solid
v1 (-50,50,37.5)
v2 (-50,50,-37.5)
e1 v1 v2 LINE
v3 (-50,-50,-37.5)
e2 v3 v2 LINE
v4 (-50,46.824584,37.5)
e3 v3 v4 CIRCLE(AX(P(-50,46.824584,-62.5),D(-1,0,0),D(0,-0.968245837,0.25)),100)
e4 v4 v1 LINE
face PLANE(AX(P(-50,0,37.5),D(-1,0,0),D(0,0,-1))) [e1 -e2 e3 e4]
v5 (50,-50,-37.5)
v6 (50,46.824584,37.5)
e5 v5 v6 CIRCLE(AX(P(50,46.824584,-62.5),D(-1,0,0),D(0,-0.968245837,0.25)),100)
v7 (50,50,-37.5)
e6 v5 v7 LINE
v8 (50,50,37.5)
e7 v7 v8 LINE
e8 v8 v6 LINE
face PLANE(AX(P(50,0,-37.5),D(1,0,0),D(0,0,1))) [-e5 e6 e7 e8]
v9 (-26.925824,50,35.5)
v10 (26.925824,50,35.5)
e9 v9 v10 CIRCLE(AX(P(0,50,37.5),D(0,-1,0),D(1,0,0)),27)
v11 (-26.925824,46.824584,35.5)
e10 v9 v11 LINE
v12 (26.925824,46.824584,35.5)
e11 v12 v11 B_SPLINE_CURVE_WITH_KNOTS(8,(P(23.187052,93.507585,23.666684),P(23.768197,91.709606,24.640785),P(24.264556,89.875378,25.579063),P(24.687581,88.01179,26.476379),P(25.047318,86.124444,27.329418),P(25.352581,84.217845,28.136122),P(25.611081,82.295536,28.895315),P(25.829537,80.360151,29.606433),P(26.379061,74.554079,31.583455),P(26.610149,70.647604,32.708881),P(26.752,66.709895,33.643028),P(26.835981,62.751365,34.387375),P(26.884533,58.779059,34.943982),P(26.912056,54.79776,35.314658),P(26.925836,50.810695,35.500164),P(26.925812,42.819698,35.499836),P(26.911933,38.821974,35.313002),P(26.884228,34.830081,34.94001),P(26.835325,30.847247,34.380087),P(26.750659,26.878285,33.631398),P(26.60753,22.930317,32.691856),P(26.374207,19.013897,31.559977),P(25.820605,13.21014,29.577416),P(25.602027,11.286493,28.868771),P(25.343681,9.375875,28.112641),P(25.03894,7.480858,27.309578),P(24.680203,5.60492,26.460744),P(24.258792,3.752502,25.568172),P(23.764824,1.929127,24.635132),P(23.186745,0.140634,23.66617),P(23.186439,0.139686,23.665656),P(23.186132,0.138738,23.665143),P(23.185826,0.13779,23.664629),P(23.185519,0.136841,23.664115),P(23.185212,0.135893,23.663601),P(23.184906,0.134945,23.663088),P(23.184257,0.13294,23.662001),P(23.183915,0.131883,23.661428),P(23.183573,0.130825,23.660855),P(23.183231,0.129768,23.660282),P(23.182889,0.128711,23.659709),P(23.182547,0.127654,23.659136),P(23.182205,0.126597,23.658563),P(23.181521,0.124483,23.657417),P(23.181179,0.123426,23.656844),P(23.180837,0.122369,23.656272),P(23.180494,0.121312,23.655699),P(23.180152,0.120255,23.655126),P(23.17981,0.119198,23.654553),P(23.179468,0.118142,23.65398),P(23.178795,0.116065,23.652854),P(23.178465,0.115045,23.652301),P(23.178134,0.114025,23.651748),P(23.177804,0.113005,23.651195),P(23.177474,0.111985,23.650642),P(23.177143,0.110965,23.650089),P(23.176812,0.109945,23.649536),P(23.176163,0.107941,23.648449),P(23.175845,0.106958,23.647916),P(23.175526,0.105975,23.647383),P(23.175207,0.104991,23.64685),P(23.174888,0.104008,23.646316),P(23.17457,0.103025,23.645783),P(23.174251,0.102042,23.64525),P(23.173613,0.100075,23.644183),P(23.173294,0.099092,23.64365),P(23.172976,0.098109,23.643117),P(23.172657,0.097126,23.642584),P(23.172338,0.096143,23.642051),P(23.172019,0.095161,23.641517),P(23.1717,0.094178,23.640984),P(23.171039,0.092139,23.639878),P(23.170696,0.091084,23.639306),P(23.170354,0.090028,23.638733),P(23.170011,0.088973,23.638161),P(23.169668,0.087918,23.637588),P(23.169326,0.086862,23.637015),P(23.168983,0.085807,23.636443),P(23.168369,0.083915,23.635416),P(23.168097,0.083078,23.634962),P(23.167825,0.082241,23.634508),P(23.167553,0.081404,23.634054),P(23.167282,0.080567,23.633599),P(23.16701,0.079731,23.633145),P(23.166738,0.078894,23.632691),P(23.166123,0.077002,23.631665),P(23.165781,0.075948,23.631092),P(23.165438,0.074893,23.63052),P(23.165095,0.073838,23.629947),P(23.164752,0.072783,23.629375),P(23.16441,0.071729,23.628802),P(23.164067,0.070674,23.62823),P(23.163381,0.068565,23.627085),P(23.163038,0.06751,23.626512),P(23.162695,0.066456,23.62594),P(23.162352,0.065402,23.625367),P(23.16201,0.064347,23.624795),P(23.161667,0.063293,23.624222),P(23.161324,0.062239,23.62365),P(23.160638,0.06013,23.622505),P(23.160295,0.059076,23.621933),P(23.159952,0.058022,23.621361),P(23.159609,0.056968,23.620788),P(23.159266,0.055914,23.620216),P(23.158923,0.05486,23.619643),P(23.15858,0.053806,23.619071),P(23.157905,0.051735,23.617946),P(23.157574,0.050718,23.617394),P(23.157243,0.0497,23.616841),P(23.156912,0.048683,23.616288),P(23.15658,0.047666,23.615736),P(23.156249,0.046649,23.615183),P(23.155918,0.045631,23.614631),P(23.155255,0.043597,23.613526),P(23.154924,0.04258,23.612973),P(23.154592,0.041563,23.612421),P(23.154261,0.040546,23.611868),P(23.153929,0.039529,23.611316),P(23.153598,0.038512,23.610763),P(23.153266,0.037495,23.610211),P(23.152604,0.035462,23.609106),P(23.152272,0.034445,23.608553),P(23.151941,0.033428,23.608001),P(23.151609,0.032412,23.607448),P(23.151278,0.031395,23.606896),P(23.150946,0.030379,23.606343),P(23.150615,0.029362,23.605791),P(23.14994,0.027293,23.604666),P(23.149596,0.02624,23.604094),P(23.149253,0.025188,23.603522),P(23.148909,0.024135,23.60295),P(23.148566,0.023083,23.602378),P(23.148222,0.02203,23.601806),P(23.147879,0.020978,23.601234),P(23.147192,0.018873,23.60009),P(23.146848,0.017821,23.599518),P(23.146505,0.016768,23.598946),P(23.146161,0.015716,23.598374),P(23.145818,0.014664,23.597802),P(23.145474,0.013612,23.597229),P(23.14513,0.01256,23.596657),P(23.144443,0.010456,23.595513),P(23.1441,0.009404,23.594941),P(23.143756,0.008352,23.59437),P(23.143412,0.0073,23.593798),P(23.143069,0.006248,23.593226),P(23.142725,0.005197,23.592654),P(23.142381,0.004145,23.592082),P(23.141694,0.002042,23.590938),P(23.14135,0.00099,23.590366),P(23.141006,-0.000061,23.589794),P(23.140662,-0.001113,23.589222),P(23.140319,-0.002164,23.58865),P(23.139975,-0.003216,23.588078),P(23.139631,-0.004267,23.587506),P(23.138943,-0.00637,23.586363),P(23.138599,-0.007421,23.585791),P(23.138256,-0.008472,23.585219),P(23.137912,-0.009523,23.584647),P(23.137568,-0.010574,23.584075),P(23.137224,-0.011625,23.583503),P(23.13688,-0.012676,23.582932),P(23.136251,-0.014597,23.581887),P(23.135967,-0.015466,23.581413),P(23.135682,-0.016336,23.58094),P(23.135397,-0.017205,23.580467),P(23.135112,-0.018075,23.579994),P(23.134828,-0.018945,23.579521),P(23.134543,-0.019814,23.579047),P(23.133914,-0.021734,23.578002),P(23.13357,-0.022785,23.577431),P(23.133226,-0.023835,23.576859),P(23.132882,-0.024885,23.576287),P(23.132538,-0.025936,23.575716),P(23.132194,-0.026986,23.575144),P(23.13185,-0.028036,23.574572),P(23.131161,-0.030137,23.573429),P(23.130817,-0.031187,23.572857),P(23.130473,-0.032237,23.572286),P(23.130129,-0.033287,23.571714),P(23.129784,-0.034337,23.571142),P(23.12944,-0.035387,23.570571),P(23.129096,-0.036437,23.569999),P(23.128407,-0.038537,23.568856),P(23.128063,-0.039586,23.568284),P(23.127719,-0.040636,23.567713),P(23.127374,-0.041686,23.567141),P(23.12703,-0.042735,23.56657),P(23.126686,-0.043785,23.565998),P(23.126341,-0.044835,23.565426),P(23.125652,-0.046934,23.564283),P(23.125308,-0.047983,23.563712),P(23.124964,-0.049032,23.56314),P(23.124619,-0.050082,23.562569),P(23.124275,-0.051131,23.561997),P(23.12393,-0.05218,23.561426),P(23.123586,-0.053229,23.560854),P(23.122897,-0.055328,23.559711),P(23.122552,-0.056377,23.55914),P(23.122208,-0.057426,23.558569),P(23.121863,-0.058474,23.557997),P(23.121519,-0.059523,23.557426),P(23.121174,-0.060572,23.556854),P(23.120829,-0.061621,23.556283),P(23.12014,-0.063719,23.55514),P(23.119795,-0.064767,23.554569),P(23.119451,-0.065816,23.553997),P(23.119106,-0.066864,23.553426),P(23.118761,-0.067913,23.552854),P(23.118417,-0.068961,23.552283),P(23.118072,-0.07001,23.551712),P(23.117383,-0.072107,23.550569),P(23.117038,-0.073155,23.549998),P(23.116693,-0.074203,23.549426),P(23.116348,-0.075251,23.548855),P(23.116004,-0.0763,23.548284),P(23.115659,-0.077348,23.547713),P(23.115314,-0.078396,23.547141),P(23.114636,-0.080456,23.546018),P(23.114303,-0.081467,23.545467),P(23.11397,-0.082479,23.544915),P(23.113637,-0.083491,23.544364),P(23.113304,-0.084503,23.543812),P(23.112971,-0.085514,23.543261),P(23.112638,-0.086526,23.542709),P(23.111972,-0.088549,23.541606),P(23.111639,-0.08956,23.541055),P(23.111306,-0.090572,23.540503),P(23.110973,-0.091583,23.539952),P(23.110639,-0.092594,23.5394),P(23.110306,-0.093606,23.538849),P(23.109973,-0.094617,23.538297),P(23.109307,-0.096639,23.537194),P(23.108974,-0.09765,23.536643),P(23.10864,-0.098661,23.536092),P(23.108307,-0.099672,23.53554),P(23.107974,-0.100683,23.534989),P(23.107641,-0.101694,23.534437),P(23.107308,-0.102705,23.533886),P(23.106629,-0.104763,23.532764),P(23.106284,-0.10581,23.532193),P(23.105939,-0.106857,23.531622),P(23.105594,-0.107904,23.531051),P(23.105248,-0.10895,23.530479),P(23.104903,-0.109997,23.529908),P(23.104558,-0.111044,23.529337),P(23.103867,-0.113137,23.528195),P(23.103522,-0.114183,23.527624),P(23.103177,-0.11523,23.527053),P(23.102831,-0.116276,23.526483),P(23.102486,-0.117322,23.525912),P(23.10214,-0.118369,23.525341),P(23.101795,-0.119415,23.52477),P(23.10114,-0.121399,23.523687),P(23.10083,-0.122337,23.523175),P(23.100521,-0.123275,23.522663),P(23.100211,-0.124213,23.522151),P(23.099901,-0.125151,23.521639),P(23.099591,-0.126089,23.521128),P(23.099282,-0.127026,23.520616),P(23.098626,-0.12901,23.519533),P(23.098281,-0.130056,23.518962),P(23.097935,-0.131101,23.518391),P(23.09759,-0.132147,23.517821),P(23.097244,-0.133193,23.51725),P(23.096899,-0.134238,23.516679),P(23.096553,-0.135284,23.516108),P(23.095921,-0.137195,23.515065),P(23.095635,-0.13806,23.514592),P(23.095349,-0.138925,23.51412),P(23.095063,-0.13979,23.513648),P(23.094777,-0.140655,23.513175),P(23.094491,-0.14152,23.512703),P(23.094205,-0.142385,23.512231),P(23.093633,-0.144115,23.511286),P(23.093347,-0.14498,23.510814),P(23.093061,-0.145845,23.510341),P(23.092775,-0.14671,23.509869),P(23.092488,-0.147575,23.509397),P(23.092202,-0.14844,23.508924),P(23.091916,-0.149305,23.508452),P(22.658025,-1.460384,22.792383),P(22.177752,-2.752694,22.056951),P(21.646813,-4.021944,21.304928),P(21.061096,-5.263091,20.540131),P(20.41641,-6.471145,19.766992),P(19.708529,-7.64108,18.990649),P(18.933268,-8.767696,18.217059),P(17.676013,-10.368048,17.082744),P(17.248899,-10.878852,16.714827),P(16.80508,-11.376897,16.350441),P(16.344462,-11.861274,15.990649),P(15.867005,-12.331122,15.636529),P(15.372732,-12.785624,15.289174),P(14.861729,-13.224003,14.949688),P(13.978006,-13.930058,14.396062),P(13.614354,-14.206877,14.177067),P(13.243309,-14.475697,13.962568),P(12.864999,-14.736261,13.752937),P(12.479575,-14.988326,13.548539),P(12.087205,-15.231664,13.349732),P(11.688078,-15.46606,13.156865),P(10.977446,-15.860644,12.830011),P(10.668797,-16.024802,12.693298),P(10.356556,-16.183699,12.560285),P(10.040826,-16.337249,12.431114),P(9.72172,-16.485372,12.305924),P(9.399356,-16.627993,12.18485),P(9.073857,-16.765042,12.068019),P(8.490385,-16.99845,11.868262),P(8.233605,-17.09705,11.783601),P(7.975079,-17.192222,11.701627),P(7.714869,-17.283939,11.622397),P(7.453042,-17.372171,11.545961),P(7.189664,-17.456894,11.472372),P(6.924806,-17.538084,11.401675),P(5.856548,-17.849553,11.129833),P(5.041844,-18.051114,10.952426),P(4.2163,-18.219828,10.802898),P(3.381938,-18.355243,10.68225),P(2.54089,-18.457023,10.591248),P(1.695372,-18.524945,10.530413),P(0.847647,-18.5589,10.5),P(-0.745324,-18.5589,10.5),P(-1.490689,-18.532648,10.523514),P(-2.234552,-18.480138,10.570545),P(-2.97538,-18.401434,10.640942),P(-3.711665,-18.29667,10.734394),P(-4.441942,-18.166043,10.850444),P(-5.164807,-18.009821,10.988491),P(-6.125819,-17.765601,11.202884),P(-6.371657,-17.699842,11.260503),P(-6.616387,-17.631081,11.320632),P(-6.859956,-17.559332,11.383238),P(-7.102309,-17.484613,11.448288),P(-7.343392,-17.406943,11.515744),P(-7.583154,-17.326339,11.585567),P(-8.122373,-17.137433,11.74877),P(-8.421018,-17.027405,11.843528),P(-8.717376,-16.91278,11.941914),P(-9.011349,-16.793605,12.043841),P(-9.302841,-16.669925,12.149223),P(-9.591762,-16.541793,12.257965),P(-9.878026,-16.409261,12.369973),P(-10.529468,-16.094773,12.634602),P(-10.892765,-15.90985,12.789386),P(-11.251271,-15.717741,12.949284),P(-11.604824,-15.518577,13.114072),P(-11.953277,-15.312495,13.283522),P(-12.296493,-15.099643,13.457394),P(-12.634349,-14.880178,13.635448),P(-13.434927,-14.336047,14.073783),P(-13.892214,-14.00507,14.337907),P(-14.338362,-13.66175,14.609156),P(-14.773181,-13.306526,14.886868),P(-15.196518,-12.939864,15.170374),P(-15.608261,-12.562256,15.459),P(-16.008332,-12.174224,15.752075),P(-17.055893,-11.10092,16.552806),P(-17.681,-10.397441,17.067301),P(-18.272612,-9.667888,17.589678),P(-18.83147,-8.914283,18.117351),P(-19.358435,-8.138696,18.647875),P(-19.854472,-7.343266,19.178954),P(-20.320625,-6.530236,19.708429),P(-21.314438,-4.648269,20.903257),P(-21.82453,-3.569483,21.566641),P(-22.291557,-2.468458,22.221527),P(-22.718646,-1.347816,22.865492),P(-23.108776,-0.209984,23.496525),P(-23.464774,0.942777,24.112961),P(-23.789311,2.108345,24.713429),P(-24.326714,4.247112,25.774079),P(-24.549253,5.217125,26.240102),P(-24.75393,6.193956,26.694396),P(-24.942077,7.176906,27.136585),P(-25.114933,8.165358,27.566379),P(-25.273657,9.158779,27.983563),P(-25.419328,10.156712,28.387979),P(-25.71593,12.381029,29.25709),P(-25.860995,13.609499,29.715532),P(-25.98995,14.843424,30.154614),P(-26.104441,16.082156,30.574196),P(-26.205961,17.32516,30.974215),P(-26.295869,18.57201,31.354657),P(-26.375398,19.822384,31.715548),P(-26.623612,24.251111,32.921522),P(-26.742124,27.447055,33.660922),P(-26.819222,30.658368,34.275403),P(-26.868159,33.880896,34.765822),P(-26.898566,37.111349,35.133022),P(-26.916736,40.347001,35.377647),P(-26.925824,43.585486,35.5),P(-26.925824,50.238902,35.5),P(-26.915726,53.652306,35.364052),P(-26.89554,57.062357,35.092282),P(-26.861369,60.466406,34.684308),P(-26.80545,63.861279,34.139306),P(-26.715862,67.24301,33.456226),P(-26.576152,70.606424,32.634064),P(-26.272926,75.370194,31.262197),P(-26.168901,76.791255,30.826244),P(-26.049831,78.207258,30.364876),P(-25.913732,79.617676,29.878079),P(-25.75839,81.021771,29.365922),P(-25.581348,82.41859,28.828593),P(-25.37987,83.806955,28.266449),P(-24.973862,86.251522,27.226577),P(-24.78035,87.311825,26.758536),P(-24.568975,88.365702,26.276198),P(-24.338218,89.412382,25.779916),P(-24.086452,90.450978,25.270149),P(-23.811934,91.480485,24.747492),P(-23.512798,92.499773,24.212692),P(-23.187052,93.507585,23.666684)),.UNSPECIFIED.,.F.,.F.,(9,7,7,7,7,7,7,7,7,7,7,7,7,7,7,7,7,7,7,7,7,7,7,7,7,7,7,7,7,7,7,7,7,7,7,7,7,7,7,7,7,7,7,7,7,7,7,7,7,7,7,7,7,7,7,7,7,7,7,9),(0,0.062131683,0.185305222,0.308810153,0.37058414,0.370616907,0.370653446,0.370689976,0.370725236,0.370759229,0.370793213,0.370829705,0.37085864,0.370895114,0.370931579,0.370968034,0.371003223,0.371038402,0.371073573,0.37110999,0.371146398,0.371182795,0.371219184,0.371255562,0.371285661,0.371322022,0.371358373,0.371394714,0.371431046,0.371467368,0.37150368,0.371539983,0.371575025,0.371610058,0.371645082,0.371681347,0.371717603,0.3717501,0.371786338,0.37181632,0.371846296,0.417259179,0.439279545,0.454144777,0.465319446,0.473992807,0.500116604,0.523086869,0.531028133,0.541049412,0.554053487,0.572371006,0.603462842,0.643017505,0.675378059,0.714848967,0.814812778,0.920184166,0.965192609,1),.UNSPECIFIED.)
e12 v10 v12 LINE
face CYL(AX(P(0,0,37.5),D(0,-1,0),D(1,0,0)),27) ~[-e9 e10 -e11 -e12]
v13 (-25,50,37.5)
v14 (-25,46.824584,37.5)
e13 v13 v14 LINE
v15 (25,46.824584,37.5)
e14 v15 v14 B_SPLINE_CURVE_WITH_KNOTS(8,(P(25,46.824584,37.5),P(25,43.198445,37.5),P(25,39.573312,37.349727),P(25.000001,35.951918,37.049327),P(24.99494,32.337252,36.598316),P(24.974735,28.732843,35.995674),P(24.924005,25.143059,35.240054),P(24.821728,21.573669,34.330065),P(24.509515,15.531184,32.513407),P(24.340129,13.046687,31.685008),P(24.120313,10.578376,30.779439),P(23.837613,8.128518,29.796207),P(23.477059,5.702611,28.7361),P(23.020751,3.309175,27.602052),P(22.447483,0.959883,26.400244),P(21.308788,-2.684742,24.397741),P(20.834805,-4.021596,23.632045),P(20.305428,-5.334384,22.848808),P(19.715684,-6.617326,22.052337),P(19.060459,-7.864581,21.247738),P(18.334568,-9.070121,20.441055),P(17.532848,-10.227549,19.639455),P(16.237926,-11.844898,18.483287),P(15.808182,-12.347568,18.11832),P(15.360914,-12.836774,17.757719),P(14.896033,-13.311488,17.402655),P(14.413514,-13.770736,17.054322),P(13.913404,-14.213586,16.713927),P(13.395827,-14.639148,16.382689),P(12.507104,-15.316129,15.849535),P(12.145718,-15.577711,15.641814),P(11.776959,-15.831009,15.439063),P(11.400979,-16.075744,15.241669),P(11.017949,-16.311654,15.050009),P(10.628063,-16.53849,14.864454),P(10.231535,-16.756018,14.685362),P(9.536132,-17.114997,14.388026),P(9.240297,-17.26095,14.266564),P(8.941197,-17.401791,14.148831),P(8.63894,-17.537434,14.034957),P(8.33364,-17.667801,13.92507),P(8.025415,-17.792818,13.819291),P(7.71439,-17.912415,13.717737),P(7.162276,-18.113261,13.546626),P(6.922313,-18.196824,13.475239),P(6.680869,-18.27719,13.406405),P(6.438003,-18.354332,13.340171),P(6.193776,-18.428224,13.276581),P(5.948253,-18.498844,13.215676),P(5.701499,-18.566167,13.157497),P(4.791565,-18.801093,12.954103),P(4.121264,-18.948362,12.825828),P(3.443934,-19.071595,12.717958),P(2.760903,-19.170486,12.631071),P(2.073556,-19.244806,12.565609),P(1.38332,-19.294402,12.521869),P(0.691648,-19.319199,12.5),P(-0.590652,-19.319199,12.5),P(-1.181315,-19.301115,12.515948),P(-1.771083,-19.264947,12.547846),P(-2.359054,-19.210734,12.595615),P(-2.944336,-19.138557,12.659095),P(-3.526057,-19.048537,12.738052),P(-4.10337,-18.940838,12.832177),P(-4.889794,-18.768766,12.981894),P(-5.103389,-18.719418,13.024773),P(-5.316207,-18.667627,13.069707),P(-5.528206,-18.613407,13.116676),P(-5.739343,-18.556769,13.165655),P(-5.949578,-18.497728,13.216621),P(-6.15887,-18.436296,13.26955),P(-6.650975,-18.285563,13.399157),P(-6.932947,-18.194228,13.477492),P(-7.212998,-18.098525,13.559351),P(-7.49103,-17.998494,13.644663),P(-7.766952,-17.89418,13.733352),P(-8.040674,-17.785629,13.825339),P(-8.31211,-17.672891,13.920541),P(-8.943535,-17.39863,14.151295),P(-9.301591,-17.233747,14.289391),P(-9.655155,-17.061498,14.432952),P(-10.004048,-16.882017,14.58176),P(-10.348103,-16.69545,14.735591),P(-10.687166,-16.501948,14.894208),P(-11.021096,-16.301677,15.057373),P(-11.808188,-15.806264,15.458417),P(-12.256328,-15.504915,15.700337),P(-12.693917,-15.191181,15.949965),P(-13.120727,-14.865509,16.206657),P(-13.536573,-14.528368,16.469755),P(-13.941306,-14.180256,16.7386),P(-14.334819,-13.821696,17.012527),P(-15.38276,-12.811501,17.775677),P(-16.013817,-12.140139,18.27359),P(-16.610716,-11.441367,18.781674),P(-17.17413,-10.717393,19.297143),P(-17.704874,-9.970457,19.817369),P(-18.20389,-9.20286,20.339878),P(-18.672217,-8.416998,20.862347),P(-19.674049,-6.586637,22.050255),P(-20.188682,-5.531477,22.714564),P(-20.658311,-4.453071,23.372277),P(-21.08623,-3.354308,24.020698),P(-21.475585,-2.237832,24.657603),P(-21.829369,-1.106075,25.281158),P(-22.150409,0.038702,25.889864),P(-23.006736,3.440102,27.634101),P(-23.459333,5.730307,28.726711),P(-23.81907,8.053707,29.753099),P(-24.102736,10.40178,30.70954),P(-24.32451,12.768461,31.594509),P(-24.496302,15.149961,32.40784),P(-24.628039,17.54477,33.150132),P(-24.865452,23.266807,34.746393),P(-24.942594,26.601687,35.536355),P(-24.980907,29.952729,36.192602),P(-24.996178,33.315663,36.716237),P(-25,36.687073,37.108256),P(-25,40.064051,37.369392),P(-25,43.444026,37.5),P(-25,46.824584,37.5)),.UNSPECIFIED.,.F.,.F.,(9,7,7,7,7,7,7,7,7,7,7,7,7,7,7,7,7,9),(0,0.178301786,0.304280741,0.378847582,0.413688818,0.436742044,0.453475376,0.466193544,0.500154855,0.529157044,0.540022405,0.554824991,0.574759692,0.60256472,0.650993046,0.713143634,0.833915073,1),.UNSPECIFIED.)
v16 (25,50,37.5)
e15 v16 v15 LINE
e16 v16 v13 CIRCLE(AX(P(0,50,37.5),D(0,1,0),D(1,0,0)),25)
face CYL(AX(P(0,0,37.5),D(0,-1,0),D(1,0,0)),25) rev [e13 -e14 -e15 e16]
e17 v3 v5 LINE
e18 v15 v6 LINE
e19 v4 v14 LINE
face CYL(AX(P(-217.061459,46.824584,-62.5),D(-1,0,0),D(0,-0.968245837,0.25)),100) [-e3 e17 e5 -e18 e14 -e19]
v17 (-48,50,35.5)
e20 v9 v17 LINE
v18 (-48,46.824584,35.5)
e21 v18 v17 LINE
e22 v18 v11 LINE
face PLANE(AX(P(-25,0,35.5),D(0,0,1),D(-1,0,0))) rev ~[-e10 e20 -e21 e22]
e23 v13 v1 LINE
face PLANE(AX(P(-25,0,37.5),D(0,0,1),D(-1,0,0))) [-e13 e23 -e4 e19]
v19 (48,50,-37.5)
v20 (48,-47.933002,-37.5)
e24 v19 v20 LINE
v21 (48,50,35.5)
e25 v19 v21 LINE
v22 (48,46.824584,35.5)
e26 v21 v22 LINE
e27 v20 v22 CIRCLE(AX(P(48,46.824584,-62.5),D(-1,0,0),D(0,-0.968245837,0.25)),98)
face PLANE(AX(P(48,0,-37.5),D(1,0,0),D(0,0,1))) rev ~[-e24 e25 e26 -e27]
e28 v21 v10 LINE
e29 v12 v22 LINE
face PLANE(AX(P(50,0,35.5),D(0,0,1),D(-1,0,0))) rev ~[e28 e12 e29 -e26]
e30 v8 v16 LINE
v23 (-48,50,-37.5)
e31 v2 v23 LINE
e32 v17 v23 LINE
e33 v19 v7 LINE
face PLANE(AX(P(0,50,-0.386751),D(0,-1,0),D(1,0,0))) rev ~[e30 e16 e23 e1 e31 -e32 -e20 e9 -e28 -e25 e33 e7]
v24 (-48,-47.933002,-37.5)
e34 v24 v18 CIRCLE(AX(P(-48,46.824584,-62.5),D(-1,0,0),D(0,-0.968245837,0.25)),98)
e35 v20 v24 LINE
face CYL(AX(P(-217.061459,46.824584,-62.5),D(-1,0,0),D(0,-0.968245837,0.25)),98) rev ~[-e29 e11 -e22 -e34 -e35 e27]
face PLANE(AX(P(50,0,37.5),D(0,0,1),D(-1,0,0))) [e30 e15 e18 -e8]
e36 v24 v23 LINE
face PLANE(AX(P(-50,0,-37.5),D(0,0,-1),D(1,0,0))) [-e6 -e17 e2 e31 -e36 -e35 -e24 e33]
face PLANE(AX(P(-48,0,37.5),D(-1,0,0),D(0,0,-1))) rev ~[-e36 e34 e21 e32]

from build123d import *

# Parameters (mm, degrees)
F1_DEPTH    = 50
F2_T1_DEPTH = 509.1229182759
F3_T        = -2


# Not quite as in the source:
# - a fillet or chamfer that OpenCascade refuses, or shapes differently, is made with other operations: its cross-section is extruded or revolved along the edge and cut away or added


with BuildPart() as f1:
    # F0 (on Front) → F1 (new body, symmetric)
    with BuildSketch(Plane.XZ):
        with BuildLine():
            Line((50, -37.5), (50, 37.5))
            Line((50, 37.5), (25, 37.5))
            ThreePointArc((25, 37.5), (0, 12.5), (-25, 37.5))
            Line((-25, 37.5), (-50, 37.5))
            Line((-50, 37.5), (-50, -37.5))
            Line((-50, -37.5), (50, -37.5))
        make_face()
    extrude(amount=F1_DEPTH, both=True)

    # F2: fillet of radius 100 on 1 edges, made by hand

    # F2_s2 → F2_t1 (cut)
    with BuildSketch(Plane.YZ.offset(-217.061459138)):
        with BuildLine():
            ThreePointArc((-50, -37.5), (-14.4126599144, 16.5569415042), (46.8245836552, 37.5))
            Line((46.8245836552, 37.5), (-50, 37.5))
            Line((-50, 37.5), (-50, -37.5))
        make_face()
    extrude(amount=F2_T1_DEPTH, mode=Mode.SUBTRACT)

    # F3
    f3_openings = [f1.faces().sort_by_distance(p)[0] for p in [
        (0, 50, -4.049992),
        (0, 0, -37.5),
    ]]
    offset(amount=F3_T, openings=f3_openings, kind=Kind.INTERSECTION)


solid = f1.part
